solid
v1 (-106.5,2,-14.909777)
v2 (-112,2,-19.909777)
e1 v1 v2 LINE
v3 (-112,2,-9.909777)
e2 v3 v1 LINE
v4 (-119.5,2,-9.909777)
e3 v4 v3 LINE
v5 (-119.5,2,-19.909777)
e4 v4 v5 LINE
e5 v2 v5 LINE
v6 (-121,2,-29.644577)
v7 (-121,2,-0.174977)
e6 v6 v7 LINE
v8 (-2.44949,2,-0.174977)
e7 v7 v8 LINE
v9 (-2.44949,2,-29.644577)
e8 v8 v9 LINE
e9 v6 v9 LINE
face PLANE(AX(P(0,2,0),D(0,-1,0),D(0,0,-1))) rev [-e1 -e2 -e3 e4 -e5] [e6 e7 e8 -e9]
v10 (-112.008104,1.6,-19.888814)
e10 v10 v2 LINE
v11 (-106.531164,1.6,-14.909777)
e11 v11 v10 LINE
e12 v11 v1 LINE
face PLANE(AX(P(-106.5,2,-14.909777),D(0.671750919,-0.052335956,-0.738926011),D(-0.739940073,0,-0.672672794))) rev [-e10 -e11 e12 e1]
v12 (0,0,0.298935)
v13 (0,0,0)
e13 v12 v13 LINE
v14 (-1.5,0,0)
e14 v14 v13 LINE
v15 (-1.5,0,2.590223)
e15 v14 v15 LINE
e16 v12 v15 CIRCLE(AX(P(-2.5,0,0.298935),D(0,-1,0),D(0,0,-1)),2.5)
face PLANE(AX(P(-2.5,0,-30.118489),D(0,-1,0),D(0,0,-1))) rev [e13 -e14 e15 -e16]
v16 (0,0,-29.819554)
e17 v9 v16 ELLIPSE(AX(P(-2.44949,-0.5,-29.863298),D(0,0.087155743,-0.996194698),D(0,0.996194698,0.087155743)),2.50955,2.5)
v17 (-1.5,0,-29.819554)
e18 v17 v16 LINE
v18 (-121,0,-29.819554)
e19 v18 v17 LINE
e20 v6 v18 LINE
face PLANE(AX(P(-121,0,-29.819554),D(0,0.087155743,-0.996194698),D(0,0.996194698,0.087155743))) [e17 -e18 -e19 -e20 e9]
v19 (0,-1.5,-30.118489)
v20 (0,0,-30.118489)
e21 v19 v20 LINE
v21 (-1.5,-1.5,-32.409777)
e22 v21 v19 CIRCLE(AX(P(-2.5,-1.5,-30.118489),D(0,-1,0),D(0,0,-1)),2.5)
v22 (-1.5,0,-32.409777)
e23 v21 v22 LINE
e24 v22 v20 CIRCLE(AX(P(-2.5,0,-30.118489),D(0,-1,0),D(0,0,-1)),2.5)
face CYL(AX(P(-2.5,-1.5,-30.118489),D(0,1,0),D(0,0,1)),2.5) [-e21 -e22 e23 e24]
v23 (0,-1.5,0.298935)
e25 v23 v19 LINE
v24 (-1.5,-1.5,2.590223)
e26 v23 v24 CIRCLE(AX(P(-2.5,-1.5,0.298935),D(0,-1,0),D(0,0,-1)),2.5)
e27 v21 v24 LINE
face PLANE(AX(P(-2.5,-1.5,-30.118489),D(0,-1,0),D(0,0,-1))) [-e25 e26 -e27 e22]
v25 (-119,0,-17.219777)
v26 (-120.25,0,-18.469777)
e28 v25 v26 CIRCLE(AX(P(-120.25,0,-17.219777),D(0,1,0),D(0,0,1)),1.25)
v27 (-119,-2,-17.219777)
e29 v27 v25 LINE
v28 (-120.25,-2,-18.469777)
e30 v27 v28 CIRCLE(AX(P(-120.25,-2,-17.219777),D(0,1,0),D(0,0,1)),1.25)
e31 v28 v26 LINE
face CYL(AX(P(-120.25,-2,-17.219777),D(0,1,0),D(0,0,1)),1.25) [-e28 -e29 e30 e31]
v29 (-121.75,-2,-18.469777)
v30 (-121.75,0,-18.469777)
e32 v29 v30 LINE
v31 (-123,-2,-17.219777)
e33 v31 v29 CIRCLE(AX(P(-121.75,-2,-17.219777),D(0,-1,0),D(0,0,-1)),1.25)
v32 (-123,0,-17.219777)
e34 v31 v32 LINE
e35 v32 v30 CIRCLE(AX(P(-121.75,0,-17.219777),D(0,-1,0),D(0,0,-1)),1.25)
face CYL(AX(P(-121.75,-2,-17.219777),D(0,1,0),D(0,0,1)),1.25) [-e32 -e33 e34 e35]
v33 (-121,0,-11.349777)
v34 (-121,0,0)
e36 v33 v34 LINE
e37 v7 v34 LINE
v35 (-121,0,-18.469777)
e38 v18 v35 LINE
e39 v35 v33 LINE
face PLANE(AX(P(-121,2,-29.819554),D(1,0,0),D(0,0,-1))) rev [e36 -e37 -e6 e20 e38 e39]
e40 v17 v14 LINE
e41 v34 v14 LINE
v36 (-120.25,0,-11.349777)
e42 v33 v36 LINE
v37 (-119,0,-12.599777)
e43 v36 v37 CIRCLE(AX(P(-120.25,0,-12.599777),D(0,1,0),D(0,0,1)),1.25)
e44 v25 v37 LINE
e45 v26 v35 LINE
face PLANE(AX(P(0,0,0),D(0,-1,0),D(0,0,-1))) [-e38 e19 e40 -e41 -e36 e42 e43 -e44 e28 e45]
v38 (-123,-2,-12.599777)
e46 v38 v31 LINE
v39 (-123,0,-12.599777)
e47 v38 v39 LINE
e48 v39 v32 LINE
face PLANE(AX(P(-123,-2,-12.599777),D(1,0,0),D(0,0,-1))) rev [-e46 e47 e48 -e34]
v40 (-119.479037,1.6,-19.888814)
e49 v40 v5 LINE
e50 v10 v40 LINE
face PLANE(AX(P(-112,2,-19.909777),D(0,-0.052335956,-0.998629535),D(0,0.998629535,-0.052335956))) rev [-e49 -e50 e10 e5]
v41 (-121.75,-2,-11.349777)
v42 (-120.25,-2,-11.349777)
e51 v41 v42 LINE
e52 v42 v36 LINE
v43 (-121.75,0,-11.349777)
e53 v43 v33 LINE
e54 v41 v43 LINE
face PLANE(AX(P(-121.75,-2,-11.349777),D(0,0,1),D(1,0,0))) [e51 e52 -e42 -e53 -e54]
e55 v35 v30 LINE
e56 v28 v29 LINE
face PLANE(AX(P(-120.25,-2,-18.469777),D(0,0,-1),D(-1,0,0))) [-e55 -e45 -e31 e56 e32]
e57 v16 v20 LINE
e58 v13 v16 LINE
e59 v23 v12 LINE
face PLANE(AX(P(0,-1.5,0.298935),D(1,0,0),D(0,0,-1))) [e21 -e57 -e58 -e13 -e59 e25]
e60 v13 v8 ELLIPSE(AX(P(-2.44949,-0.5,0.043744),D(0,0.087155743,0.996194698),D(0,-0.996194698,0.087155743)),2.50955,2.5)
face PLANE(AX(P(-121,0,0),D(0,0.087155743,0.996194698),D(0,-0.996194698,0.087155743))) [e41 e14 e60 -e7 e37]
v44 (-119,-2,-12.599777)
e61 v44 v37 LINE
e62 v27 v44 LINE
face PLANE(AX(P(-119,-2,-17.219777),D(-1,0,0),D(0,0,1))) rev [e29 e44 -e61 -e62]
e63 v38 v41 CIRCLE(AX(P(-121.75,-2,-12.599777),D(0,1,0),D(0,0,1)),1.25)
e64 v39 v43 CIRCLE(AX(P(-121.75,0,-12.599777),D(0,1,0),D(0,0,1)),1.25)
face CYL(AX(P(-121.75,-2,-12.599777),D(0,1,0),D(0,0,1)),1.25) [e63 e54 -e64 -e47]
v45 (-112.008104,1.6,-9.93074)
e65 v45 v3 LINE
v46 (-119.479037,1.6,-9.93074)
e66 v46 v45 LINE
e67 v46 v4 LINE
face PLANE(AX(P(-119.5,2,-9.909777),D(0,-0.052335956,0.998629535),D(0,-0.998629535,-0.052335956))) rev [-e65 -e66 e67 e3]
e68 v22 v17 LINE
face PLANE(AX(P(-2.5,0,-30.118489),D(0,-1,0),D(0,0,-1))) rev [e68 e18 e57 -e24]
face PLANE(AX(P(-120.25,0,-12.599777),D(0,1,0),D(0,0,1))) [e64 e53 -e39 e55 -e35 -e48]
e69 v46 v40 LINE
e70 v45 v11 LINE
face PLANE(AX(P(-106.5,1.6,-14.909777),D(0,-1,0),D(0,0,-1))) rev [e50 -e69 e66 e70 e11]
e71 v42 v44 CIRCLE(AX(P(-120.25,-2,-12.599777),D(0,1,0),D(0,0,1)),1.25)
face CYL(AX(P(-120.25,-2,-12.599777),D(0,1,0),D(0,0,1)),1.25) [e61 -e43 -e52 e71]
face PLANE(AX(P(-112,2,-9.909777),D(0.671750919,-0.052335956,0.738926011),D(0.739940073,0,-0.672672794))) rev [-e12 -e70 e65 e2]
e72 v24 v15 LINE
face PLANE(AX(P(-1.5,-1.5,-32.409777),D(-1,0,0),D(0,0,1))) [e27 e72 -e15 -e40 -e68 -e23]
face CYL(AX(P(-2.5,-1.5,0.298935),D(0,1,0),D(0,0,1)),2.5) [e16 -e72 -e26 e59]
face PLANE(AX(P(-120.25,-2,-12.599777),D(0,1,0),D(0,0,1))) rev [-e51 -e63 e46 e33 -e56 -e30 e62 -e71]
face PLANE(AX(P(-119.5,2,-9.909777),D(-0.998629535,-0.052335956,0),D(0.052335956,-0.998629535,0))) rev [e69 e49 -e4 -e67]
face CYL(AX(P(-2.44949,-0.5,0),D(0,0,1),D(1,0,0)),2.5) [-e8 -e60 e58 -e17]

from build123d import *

# Parameters (mm, degrees)
SKETCH2_W           = 121
SKETCH2_H           = 29.819553929
BASE_EXTRUDE_DEPTH  = 2
DRAFT1_ANGLE        = 5
FILLET3_R           = 2.5
BOSS_EXTRUDE1_DEPTH = 1.5
BOSS_EXTRUDE2_DEPTH = 2
CUT_EXTRUDE3_DEPTH  = 0.4
CUT_EXTRUDE3_TAPER  = 3


with BuildPart() as part:
    # Sketch2 → Base-Extrude (new body)
    with BuildSketch(Plane(origin=(0, 0, 0), x_dir=(1, 0, 0), z_dir=(0, 1, 0))):
        with Locations((-60.5, 14.909776965)):
            Rectangle(SKETCH2_W, SKETCH2_H)
    extrude(amount=BASE_EXTRUDE_DEPTH)

    # Draft1
    draft1_faces = [part.faces().sort_by_distance(p)[0] for p in [
        (-60.5, 1, 0),
        (-60.5, 1, -29.819553929),
    ]]
    draft(draft1_faces, Plane.ZX, DRAFT1_ANGLE)

    # Fillet3
    # the kernel refuses this fillet: 2.5 mm, written as the material it takes off along each edge
    with BuildSketch(Plane(origin=(0, 2, 5.94874703), x_dir=(-1.5669991185737358e-12, -1.0, 0), z_dir=(0, 0, -1))) as fillet3_piece_1:
        with BuildLine():
            CenterArc((2.5, 2.449489743), FILLET3_R, 180, 78.463040967)
            Line((0, 2.449489743), (-0.05, 2.449489743))
            Line((-0.05, 2.449489743), (-0.05, 0))
            Line((-0.05, 0), (0, -0.05))
            ThreePointArc((0, -0.05), (1, -0.05), (1.99, -0.048989795))
            Line((1.99, -0.048989795), (2, 0))
        make_face()
    extrude(amount=41.717047988, mode=Mode.SUBTRACT)

    # Sketch3 → Boss-Extrude1 (add)
    with BuildSketch(Plane.XZ):
        with BuildLine():
            Line((0, 0.298935188), (0, -30.118489117))
            ThreePointArc((0, -30.118489117), (-0.408349934, -31.487795511), (-1.5, -32.409776964))
            Line((-1.5, -32.409776964), (-1.5, 2.590223036))
            ThreePointArc((-1.5, 2.590223036), (-0.408349934, 1.668241582), (0, 0.298935188))
        make_face()
    extrude(amount=BOSS_EXTRUDE1_DEPTH)

    # Sketch4 → Boss-Extrude2 (add)
    with BuildSketch(Plane.XZ):
        with BuildLine():
            Line((-120.25, -18.469776964), (-121.75, -18.469776964))
            ThreePointArc((-121.75, -18.469776964), (-122.633883476, -18.103660441), (-123, -17.219776964))
            Line((-123, -17.219776964), (-123, -12.599776964))
            ThreePointArc((-123, -12.599776964), (-122.633883476, -11.715893488), (-121.75, -11.349776964))
            Line((-121.75, -11.349776964), (-120.25, -11.349776964))
            ThreePointArc((-120.25, -11.349776964), (-119.366116524, -11.715893488), (-119, -12.599776964))
            Line((-119, -12.599776964), (-119, -17.219776964))
            ThreePointArc((-119, -17.219776964), (-119.366116524, -18.103660441), (-120.25, -18.469776964))
        make_face()
    extrude(amount=BOSS_EXTRUDE2_DEPTH)

    # Sketch5 → Cut-Extrude3 (cut)
    with BuildSketch(Plane(origin=(-217.927600689, 2, 0), x_dir=(1, 0, 0), z_dir=(0, -1, 0))):
        Polygon((105.927600689, -19.909776964), (111.427600689, -14.909776964), (105.927600689, -9.909776964), (98.427600689, -9.909776964), (98.427600689, -19.909776964), align=None)
    extrude(amount=CUT_EXTRUDE3_DEPTH, taper=CUT_EXTRUDE3_TAPER, mode=Mode.SUBTRACT)


solid = part.part
